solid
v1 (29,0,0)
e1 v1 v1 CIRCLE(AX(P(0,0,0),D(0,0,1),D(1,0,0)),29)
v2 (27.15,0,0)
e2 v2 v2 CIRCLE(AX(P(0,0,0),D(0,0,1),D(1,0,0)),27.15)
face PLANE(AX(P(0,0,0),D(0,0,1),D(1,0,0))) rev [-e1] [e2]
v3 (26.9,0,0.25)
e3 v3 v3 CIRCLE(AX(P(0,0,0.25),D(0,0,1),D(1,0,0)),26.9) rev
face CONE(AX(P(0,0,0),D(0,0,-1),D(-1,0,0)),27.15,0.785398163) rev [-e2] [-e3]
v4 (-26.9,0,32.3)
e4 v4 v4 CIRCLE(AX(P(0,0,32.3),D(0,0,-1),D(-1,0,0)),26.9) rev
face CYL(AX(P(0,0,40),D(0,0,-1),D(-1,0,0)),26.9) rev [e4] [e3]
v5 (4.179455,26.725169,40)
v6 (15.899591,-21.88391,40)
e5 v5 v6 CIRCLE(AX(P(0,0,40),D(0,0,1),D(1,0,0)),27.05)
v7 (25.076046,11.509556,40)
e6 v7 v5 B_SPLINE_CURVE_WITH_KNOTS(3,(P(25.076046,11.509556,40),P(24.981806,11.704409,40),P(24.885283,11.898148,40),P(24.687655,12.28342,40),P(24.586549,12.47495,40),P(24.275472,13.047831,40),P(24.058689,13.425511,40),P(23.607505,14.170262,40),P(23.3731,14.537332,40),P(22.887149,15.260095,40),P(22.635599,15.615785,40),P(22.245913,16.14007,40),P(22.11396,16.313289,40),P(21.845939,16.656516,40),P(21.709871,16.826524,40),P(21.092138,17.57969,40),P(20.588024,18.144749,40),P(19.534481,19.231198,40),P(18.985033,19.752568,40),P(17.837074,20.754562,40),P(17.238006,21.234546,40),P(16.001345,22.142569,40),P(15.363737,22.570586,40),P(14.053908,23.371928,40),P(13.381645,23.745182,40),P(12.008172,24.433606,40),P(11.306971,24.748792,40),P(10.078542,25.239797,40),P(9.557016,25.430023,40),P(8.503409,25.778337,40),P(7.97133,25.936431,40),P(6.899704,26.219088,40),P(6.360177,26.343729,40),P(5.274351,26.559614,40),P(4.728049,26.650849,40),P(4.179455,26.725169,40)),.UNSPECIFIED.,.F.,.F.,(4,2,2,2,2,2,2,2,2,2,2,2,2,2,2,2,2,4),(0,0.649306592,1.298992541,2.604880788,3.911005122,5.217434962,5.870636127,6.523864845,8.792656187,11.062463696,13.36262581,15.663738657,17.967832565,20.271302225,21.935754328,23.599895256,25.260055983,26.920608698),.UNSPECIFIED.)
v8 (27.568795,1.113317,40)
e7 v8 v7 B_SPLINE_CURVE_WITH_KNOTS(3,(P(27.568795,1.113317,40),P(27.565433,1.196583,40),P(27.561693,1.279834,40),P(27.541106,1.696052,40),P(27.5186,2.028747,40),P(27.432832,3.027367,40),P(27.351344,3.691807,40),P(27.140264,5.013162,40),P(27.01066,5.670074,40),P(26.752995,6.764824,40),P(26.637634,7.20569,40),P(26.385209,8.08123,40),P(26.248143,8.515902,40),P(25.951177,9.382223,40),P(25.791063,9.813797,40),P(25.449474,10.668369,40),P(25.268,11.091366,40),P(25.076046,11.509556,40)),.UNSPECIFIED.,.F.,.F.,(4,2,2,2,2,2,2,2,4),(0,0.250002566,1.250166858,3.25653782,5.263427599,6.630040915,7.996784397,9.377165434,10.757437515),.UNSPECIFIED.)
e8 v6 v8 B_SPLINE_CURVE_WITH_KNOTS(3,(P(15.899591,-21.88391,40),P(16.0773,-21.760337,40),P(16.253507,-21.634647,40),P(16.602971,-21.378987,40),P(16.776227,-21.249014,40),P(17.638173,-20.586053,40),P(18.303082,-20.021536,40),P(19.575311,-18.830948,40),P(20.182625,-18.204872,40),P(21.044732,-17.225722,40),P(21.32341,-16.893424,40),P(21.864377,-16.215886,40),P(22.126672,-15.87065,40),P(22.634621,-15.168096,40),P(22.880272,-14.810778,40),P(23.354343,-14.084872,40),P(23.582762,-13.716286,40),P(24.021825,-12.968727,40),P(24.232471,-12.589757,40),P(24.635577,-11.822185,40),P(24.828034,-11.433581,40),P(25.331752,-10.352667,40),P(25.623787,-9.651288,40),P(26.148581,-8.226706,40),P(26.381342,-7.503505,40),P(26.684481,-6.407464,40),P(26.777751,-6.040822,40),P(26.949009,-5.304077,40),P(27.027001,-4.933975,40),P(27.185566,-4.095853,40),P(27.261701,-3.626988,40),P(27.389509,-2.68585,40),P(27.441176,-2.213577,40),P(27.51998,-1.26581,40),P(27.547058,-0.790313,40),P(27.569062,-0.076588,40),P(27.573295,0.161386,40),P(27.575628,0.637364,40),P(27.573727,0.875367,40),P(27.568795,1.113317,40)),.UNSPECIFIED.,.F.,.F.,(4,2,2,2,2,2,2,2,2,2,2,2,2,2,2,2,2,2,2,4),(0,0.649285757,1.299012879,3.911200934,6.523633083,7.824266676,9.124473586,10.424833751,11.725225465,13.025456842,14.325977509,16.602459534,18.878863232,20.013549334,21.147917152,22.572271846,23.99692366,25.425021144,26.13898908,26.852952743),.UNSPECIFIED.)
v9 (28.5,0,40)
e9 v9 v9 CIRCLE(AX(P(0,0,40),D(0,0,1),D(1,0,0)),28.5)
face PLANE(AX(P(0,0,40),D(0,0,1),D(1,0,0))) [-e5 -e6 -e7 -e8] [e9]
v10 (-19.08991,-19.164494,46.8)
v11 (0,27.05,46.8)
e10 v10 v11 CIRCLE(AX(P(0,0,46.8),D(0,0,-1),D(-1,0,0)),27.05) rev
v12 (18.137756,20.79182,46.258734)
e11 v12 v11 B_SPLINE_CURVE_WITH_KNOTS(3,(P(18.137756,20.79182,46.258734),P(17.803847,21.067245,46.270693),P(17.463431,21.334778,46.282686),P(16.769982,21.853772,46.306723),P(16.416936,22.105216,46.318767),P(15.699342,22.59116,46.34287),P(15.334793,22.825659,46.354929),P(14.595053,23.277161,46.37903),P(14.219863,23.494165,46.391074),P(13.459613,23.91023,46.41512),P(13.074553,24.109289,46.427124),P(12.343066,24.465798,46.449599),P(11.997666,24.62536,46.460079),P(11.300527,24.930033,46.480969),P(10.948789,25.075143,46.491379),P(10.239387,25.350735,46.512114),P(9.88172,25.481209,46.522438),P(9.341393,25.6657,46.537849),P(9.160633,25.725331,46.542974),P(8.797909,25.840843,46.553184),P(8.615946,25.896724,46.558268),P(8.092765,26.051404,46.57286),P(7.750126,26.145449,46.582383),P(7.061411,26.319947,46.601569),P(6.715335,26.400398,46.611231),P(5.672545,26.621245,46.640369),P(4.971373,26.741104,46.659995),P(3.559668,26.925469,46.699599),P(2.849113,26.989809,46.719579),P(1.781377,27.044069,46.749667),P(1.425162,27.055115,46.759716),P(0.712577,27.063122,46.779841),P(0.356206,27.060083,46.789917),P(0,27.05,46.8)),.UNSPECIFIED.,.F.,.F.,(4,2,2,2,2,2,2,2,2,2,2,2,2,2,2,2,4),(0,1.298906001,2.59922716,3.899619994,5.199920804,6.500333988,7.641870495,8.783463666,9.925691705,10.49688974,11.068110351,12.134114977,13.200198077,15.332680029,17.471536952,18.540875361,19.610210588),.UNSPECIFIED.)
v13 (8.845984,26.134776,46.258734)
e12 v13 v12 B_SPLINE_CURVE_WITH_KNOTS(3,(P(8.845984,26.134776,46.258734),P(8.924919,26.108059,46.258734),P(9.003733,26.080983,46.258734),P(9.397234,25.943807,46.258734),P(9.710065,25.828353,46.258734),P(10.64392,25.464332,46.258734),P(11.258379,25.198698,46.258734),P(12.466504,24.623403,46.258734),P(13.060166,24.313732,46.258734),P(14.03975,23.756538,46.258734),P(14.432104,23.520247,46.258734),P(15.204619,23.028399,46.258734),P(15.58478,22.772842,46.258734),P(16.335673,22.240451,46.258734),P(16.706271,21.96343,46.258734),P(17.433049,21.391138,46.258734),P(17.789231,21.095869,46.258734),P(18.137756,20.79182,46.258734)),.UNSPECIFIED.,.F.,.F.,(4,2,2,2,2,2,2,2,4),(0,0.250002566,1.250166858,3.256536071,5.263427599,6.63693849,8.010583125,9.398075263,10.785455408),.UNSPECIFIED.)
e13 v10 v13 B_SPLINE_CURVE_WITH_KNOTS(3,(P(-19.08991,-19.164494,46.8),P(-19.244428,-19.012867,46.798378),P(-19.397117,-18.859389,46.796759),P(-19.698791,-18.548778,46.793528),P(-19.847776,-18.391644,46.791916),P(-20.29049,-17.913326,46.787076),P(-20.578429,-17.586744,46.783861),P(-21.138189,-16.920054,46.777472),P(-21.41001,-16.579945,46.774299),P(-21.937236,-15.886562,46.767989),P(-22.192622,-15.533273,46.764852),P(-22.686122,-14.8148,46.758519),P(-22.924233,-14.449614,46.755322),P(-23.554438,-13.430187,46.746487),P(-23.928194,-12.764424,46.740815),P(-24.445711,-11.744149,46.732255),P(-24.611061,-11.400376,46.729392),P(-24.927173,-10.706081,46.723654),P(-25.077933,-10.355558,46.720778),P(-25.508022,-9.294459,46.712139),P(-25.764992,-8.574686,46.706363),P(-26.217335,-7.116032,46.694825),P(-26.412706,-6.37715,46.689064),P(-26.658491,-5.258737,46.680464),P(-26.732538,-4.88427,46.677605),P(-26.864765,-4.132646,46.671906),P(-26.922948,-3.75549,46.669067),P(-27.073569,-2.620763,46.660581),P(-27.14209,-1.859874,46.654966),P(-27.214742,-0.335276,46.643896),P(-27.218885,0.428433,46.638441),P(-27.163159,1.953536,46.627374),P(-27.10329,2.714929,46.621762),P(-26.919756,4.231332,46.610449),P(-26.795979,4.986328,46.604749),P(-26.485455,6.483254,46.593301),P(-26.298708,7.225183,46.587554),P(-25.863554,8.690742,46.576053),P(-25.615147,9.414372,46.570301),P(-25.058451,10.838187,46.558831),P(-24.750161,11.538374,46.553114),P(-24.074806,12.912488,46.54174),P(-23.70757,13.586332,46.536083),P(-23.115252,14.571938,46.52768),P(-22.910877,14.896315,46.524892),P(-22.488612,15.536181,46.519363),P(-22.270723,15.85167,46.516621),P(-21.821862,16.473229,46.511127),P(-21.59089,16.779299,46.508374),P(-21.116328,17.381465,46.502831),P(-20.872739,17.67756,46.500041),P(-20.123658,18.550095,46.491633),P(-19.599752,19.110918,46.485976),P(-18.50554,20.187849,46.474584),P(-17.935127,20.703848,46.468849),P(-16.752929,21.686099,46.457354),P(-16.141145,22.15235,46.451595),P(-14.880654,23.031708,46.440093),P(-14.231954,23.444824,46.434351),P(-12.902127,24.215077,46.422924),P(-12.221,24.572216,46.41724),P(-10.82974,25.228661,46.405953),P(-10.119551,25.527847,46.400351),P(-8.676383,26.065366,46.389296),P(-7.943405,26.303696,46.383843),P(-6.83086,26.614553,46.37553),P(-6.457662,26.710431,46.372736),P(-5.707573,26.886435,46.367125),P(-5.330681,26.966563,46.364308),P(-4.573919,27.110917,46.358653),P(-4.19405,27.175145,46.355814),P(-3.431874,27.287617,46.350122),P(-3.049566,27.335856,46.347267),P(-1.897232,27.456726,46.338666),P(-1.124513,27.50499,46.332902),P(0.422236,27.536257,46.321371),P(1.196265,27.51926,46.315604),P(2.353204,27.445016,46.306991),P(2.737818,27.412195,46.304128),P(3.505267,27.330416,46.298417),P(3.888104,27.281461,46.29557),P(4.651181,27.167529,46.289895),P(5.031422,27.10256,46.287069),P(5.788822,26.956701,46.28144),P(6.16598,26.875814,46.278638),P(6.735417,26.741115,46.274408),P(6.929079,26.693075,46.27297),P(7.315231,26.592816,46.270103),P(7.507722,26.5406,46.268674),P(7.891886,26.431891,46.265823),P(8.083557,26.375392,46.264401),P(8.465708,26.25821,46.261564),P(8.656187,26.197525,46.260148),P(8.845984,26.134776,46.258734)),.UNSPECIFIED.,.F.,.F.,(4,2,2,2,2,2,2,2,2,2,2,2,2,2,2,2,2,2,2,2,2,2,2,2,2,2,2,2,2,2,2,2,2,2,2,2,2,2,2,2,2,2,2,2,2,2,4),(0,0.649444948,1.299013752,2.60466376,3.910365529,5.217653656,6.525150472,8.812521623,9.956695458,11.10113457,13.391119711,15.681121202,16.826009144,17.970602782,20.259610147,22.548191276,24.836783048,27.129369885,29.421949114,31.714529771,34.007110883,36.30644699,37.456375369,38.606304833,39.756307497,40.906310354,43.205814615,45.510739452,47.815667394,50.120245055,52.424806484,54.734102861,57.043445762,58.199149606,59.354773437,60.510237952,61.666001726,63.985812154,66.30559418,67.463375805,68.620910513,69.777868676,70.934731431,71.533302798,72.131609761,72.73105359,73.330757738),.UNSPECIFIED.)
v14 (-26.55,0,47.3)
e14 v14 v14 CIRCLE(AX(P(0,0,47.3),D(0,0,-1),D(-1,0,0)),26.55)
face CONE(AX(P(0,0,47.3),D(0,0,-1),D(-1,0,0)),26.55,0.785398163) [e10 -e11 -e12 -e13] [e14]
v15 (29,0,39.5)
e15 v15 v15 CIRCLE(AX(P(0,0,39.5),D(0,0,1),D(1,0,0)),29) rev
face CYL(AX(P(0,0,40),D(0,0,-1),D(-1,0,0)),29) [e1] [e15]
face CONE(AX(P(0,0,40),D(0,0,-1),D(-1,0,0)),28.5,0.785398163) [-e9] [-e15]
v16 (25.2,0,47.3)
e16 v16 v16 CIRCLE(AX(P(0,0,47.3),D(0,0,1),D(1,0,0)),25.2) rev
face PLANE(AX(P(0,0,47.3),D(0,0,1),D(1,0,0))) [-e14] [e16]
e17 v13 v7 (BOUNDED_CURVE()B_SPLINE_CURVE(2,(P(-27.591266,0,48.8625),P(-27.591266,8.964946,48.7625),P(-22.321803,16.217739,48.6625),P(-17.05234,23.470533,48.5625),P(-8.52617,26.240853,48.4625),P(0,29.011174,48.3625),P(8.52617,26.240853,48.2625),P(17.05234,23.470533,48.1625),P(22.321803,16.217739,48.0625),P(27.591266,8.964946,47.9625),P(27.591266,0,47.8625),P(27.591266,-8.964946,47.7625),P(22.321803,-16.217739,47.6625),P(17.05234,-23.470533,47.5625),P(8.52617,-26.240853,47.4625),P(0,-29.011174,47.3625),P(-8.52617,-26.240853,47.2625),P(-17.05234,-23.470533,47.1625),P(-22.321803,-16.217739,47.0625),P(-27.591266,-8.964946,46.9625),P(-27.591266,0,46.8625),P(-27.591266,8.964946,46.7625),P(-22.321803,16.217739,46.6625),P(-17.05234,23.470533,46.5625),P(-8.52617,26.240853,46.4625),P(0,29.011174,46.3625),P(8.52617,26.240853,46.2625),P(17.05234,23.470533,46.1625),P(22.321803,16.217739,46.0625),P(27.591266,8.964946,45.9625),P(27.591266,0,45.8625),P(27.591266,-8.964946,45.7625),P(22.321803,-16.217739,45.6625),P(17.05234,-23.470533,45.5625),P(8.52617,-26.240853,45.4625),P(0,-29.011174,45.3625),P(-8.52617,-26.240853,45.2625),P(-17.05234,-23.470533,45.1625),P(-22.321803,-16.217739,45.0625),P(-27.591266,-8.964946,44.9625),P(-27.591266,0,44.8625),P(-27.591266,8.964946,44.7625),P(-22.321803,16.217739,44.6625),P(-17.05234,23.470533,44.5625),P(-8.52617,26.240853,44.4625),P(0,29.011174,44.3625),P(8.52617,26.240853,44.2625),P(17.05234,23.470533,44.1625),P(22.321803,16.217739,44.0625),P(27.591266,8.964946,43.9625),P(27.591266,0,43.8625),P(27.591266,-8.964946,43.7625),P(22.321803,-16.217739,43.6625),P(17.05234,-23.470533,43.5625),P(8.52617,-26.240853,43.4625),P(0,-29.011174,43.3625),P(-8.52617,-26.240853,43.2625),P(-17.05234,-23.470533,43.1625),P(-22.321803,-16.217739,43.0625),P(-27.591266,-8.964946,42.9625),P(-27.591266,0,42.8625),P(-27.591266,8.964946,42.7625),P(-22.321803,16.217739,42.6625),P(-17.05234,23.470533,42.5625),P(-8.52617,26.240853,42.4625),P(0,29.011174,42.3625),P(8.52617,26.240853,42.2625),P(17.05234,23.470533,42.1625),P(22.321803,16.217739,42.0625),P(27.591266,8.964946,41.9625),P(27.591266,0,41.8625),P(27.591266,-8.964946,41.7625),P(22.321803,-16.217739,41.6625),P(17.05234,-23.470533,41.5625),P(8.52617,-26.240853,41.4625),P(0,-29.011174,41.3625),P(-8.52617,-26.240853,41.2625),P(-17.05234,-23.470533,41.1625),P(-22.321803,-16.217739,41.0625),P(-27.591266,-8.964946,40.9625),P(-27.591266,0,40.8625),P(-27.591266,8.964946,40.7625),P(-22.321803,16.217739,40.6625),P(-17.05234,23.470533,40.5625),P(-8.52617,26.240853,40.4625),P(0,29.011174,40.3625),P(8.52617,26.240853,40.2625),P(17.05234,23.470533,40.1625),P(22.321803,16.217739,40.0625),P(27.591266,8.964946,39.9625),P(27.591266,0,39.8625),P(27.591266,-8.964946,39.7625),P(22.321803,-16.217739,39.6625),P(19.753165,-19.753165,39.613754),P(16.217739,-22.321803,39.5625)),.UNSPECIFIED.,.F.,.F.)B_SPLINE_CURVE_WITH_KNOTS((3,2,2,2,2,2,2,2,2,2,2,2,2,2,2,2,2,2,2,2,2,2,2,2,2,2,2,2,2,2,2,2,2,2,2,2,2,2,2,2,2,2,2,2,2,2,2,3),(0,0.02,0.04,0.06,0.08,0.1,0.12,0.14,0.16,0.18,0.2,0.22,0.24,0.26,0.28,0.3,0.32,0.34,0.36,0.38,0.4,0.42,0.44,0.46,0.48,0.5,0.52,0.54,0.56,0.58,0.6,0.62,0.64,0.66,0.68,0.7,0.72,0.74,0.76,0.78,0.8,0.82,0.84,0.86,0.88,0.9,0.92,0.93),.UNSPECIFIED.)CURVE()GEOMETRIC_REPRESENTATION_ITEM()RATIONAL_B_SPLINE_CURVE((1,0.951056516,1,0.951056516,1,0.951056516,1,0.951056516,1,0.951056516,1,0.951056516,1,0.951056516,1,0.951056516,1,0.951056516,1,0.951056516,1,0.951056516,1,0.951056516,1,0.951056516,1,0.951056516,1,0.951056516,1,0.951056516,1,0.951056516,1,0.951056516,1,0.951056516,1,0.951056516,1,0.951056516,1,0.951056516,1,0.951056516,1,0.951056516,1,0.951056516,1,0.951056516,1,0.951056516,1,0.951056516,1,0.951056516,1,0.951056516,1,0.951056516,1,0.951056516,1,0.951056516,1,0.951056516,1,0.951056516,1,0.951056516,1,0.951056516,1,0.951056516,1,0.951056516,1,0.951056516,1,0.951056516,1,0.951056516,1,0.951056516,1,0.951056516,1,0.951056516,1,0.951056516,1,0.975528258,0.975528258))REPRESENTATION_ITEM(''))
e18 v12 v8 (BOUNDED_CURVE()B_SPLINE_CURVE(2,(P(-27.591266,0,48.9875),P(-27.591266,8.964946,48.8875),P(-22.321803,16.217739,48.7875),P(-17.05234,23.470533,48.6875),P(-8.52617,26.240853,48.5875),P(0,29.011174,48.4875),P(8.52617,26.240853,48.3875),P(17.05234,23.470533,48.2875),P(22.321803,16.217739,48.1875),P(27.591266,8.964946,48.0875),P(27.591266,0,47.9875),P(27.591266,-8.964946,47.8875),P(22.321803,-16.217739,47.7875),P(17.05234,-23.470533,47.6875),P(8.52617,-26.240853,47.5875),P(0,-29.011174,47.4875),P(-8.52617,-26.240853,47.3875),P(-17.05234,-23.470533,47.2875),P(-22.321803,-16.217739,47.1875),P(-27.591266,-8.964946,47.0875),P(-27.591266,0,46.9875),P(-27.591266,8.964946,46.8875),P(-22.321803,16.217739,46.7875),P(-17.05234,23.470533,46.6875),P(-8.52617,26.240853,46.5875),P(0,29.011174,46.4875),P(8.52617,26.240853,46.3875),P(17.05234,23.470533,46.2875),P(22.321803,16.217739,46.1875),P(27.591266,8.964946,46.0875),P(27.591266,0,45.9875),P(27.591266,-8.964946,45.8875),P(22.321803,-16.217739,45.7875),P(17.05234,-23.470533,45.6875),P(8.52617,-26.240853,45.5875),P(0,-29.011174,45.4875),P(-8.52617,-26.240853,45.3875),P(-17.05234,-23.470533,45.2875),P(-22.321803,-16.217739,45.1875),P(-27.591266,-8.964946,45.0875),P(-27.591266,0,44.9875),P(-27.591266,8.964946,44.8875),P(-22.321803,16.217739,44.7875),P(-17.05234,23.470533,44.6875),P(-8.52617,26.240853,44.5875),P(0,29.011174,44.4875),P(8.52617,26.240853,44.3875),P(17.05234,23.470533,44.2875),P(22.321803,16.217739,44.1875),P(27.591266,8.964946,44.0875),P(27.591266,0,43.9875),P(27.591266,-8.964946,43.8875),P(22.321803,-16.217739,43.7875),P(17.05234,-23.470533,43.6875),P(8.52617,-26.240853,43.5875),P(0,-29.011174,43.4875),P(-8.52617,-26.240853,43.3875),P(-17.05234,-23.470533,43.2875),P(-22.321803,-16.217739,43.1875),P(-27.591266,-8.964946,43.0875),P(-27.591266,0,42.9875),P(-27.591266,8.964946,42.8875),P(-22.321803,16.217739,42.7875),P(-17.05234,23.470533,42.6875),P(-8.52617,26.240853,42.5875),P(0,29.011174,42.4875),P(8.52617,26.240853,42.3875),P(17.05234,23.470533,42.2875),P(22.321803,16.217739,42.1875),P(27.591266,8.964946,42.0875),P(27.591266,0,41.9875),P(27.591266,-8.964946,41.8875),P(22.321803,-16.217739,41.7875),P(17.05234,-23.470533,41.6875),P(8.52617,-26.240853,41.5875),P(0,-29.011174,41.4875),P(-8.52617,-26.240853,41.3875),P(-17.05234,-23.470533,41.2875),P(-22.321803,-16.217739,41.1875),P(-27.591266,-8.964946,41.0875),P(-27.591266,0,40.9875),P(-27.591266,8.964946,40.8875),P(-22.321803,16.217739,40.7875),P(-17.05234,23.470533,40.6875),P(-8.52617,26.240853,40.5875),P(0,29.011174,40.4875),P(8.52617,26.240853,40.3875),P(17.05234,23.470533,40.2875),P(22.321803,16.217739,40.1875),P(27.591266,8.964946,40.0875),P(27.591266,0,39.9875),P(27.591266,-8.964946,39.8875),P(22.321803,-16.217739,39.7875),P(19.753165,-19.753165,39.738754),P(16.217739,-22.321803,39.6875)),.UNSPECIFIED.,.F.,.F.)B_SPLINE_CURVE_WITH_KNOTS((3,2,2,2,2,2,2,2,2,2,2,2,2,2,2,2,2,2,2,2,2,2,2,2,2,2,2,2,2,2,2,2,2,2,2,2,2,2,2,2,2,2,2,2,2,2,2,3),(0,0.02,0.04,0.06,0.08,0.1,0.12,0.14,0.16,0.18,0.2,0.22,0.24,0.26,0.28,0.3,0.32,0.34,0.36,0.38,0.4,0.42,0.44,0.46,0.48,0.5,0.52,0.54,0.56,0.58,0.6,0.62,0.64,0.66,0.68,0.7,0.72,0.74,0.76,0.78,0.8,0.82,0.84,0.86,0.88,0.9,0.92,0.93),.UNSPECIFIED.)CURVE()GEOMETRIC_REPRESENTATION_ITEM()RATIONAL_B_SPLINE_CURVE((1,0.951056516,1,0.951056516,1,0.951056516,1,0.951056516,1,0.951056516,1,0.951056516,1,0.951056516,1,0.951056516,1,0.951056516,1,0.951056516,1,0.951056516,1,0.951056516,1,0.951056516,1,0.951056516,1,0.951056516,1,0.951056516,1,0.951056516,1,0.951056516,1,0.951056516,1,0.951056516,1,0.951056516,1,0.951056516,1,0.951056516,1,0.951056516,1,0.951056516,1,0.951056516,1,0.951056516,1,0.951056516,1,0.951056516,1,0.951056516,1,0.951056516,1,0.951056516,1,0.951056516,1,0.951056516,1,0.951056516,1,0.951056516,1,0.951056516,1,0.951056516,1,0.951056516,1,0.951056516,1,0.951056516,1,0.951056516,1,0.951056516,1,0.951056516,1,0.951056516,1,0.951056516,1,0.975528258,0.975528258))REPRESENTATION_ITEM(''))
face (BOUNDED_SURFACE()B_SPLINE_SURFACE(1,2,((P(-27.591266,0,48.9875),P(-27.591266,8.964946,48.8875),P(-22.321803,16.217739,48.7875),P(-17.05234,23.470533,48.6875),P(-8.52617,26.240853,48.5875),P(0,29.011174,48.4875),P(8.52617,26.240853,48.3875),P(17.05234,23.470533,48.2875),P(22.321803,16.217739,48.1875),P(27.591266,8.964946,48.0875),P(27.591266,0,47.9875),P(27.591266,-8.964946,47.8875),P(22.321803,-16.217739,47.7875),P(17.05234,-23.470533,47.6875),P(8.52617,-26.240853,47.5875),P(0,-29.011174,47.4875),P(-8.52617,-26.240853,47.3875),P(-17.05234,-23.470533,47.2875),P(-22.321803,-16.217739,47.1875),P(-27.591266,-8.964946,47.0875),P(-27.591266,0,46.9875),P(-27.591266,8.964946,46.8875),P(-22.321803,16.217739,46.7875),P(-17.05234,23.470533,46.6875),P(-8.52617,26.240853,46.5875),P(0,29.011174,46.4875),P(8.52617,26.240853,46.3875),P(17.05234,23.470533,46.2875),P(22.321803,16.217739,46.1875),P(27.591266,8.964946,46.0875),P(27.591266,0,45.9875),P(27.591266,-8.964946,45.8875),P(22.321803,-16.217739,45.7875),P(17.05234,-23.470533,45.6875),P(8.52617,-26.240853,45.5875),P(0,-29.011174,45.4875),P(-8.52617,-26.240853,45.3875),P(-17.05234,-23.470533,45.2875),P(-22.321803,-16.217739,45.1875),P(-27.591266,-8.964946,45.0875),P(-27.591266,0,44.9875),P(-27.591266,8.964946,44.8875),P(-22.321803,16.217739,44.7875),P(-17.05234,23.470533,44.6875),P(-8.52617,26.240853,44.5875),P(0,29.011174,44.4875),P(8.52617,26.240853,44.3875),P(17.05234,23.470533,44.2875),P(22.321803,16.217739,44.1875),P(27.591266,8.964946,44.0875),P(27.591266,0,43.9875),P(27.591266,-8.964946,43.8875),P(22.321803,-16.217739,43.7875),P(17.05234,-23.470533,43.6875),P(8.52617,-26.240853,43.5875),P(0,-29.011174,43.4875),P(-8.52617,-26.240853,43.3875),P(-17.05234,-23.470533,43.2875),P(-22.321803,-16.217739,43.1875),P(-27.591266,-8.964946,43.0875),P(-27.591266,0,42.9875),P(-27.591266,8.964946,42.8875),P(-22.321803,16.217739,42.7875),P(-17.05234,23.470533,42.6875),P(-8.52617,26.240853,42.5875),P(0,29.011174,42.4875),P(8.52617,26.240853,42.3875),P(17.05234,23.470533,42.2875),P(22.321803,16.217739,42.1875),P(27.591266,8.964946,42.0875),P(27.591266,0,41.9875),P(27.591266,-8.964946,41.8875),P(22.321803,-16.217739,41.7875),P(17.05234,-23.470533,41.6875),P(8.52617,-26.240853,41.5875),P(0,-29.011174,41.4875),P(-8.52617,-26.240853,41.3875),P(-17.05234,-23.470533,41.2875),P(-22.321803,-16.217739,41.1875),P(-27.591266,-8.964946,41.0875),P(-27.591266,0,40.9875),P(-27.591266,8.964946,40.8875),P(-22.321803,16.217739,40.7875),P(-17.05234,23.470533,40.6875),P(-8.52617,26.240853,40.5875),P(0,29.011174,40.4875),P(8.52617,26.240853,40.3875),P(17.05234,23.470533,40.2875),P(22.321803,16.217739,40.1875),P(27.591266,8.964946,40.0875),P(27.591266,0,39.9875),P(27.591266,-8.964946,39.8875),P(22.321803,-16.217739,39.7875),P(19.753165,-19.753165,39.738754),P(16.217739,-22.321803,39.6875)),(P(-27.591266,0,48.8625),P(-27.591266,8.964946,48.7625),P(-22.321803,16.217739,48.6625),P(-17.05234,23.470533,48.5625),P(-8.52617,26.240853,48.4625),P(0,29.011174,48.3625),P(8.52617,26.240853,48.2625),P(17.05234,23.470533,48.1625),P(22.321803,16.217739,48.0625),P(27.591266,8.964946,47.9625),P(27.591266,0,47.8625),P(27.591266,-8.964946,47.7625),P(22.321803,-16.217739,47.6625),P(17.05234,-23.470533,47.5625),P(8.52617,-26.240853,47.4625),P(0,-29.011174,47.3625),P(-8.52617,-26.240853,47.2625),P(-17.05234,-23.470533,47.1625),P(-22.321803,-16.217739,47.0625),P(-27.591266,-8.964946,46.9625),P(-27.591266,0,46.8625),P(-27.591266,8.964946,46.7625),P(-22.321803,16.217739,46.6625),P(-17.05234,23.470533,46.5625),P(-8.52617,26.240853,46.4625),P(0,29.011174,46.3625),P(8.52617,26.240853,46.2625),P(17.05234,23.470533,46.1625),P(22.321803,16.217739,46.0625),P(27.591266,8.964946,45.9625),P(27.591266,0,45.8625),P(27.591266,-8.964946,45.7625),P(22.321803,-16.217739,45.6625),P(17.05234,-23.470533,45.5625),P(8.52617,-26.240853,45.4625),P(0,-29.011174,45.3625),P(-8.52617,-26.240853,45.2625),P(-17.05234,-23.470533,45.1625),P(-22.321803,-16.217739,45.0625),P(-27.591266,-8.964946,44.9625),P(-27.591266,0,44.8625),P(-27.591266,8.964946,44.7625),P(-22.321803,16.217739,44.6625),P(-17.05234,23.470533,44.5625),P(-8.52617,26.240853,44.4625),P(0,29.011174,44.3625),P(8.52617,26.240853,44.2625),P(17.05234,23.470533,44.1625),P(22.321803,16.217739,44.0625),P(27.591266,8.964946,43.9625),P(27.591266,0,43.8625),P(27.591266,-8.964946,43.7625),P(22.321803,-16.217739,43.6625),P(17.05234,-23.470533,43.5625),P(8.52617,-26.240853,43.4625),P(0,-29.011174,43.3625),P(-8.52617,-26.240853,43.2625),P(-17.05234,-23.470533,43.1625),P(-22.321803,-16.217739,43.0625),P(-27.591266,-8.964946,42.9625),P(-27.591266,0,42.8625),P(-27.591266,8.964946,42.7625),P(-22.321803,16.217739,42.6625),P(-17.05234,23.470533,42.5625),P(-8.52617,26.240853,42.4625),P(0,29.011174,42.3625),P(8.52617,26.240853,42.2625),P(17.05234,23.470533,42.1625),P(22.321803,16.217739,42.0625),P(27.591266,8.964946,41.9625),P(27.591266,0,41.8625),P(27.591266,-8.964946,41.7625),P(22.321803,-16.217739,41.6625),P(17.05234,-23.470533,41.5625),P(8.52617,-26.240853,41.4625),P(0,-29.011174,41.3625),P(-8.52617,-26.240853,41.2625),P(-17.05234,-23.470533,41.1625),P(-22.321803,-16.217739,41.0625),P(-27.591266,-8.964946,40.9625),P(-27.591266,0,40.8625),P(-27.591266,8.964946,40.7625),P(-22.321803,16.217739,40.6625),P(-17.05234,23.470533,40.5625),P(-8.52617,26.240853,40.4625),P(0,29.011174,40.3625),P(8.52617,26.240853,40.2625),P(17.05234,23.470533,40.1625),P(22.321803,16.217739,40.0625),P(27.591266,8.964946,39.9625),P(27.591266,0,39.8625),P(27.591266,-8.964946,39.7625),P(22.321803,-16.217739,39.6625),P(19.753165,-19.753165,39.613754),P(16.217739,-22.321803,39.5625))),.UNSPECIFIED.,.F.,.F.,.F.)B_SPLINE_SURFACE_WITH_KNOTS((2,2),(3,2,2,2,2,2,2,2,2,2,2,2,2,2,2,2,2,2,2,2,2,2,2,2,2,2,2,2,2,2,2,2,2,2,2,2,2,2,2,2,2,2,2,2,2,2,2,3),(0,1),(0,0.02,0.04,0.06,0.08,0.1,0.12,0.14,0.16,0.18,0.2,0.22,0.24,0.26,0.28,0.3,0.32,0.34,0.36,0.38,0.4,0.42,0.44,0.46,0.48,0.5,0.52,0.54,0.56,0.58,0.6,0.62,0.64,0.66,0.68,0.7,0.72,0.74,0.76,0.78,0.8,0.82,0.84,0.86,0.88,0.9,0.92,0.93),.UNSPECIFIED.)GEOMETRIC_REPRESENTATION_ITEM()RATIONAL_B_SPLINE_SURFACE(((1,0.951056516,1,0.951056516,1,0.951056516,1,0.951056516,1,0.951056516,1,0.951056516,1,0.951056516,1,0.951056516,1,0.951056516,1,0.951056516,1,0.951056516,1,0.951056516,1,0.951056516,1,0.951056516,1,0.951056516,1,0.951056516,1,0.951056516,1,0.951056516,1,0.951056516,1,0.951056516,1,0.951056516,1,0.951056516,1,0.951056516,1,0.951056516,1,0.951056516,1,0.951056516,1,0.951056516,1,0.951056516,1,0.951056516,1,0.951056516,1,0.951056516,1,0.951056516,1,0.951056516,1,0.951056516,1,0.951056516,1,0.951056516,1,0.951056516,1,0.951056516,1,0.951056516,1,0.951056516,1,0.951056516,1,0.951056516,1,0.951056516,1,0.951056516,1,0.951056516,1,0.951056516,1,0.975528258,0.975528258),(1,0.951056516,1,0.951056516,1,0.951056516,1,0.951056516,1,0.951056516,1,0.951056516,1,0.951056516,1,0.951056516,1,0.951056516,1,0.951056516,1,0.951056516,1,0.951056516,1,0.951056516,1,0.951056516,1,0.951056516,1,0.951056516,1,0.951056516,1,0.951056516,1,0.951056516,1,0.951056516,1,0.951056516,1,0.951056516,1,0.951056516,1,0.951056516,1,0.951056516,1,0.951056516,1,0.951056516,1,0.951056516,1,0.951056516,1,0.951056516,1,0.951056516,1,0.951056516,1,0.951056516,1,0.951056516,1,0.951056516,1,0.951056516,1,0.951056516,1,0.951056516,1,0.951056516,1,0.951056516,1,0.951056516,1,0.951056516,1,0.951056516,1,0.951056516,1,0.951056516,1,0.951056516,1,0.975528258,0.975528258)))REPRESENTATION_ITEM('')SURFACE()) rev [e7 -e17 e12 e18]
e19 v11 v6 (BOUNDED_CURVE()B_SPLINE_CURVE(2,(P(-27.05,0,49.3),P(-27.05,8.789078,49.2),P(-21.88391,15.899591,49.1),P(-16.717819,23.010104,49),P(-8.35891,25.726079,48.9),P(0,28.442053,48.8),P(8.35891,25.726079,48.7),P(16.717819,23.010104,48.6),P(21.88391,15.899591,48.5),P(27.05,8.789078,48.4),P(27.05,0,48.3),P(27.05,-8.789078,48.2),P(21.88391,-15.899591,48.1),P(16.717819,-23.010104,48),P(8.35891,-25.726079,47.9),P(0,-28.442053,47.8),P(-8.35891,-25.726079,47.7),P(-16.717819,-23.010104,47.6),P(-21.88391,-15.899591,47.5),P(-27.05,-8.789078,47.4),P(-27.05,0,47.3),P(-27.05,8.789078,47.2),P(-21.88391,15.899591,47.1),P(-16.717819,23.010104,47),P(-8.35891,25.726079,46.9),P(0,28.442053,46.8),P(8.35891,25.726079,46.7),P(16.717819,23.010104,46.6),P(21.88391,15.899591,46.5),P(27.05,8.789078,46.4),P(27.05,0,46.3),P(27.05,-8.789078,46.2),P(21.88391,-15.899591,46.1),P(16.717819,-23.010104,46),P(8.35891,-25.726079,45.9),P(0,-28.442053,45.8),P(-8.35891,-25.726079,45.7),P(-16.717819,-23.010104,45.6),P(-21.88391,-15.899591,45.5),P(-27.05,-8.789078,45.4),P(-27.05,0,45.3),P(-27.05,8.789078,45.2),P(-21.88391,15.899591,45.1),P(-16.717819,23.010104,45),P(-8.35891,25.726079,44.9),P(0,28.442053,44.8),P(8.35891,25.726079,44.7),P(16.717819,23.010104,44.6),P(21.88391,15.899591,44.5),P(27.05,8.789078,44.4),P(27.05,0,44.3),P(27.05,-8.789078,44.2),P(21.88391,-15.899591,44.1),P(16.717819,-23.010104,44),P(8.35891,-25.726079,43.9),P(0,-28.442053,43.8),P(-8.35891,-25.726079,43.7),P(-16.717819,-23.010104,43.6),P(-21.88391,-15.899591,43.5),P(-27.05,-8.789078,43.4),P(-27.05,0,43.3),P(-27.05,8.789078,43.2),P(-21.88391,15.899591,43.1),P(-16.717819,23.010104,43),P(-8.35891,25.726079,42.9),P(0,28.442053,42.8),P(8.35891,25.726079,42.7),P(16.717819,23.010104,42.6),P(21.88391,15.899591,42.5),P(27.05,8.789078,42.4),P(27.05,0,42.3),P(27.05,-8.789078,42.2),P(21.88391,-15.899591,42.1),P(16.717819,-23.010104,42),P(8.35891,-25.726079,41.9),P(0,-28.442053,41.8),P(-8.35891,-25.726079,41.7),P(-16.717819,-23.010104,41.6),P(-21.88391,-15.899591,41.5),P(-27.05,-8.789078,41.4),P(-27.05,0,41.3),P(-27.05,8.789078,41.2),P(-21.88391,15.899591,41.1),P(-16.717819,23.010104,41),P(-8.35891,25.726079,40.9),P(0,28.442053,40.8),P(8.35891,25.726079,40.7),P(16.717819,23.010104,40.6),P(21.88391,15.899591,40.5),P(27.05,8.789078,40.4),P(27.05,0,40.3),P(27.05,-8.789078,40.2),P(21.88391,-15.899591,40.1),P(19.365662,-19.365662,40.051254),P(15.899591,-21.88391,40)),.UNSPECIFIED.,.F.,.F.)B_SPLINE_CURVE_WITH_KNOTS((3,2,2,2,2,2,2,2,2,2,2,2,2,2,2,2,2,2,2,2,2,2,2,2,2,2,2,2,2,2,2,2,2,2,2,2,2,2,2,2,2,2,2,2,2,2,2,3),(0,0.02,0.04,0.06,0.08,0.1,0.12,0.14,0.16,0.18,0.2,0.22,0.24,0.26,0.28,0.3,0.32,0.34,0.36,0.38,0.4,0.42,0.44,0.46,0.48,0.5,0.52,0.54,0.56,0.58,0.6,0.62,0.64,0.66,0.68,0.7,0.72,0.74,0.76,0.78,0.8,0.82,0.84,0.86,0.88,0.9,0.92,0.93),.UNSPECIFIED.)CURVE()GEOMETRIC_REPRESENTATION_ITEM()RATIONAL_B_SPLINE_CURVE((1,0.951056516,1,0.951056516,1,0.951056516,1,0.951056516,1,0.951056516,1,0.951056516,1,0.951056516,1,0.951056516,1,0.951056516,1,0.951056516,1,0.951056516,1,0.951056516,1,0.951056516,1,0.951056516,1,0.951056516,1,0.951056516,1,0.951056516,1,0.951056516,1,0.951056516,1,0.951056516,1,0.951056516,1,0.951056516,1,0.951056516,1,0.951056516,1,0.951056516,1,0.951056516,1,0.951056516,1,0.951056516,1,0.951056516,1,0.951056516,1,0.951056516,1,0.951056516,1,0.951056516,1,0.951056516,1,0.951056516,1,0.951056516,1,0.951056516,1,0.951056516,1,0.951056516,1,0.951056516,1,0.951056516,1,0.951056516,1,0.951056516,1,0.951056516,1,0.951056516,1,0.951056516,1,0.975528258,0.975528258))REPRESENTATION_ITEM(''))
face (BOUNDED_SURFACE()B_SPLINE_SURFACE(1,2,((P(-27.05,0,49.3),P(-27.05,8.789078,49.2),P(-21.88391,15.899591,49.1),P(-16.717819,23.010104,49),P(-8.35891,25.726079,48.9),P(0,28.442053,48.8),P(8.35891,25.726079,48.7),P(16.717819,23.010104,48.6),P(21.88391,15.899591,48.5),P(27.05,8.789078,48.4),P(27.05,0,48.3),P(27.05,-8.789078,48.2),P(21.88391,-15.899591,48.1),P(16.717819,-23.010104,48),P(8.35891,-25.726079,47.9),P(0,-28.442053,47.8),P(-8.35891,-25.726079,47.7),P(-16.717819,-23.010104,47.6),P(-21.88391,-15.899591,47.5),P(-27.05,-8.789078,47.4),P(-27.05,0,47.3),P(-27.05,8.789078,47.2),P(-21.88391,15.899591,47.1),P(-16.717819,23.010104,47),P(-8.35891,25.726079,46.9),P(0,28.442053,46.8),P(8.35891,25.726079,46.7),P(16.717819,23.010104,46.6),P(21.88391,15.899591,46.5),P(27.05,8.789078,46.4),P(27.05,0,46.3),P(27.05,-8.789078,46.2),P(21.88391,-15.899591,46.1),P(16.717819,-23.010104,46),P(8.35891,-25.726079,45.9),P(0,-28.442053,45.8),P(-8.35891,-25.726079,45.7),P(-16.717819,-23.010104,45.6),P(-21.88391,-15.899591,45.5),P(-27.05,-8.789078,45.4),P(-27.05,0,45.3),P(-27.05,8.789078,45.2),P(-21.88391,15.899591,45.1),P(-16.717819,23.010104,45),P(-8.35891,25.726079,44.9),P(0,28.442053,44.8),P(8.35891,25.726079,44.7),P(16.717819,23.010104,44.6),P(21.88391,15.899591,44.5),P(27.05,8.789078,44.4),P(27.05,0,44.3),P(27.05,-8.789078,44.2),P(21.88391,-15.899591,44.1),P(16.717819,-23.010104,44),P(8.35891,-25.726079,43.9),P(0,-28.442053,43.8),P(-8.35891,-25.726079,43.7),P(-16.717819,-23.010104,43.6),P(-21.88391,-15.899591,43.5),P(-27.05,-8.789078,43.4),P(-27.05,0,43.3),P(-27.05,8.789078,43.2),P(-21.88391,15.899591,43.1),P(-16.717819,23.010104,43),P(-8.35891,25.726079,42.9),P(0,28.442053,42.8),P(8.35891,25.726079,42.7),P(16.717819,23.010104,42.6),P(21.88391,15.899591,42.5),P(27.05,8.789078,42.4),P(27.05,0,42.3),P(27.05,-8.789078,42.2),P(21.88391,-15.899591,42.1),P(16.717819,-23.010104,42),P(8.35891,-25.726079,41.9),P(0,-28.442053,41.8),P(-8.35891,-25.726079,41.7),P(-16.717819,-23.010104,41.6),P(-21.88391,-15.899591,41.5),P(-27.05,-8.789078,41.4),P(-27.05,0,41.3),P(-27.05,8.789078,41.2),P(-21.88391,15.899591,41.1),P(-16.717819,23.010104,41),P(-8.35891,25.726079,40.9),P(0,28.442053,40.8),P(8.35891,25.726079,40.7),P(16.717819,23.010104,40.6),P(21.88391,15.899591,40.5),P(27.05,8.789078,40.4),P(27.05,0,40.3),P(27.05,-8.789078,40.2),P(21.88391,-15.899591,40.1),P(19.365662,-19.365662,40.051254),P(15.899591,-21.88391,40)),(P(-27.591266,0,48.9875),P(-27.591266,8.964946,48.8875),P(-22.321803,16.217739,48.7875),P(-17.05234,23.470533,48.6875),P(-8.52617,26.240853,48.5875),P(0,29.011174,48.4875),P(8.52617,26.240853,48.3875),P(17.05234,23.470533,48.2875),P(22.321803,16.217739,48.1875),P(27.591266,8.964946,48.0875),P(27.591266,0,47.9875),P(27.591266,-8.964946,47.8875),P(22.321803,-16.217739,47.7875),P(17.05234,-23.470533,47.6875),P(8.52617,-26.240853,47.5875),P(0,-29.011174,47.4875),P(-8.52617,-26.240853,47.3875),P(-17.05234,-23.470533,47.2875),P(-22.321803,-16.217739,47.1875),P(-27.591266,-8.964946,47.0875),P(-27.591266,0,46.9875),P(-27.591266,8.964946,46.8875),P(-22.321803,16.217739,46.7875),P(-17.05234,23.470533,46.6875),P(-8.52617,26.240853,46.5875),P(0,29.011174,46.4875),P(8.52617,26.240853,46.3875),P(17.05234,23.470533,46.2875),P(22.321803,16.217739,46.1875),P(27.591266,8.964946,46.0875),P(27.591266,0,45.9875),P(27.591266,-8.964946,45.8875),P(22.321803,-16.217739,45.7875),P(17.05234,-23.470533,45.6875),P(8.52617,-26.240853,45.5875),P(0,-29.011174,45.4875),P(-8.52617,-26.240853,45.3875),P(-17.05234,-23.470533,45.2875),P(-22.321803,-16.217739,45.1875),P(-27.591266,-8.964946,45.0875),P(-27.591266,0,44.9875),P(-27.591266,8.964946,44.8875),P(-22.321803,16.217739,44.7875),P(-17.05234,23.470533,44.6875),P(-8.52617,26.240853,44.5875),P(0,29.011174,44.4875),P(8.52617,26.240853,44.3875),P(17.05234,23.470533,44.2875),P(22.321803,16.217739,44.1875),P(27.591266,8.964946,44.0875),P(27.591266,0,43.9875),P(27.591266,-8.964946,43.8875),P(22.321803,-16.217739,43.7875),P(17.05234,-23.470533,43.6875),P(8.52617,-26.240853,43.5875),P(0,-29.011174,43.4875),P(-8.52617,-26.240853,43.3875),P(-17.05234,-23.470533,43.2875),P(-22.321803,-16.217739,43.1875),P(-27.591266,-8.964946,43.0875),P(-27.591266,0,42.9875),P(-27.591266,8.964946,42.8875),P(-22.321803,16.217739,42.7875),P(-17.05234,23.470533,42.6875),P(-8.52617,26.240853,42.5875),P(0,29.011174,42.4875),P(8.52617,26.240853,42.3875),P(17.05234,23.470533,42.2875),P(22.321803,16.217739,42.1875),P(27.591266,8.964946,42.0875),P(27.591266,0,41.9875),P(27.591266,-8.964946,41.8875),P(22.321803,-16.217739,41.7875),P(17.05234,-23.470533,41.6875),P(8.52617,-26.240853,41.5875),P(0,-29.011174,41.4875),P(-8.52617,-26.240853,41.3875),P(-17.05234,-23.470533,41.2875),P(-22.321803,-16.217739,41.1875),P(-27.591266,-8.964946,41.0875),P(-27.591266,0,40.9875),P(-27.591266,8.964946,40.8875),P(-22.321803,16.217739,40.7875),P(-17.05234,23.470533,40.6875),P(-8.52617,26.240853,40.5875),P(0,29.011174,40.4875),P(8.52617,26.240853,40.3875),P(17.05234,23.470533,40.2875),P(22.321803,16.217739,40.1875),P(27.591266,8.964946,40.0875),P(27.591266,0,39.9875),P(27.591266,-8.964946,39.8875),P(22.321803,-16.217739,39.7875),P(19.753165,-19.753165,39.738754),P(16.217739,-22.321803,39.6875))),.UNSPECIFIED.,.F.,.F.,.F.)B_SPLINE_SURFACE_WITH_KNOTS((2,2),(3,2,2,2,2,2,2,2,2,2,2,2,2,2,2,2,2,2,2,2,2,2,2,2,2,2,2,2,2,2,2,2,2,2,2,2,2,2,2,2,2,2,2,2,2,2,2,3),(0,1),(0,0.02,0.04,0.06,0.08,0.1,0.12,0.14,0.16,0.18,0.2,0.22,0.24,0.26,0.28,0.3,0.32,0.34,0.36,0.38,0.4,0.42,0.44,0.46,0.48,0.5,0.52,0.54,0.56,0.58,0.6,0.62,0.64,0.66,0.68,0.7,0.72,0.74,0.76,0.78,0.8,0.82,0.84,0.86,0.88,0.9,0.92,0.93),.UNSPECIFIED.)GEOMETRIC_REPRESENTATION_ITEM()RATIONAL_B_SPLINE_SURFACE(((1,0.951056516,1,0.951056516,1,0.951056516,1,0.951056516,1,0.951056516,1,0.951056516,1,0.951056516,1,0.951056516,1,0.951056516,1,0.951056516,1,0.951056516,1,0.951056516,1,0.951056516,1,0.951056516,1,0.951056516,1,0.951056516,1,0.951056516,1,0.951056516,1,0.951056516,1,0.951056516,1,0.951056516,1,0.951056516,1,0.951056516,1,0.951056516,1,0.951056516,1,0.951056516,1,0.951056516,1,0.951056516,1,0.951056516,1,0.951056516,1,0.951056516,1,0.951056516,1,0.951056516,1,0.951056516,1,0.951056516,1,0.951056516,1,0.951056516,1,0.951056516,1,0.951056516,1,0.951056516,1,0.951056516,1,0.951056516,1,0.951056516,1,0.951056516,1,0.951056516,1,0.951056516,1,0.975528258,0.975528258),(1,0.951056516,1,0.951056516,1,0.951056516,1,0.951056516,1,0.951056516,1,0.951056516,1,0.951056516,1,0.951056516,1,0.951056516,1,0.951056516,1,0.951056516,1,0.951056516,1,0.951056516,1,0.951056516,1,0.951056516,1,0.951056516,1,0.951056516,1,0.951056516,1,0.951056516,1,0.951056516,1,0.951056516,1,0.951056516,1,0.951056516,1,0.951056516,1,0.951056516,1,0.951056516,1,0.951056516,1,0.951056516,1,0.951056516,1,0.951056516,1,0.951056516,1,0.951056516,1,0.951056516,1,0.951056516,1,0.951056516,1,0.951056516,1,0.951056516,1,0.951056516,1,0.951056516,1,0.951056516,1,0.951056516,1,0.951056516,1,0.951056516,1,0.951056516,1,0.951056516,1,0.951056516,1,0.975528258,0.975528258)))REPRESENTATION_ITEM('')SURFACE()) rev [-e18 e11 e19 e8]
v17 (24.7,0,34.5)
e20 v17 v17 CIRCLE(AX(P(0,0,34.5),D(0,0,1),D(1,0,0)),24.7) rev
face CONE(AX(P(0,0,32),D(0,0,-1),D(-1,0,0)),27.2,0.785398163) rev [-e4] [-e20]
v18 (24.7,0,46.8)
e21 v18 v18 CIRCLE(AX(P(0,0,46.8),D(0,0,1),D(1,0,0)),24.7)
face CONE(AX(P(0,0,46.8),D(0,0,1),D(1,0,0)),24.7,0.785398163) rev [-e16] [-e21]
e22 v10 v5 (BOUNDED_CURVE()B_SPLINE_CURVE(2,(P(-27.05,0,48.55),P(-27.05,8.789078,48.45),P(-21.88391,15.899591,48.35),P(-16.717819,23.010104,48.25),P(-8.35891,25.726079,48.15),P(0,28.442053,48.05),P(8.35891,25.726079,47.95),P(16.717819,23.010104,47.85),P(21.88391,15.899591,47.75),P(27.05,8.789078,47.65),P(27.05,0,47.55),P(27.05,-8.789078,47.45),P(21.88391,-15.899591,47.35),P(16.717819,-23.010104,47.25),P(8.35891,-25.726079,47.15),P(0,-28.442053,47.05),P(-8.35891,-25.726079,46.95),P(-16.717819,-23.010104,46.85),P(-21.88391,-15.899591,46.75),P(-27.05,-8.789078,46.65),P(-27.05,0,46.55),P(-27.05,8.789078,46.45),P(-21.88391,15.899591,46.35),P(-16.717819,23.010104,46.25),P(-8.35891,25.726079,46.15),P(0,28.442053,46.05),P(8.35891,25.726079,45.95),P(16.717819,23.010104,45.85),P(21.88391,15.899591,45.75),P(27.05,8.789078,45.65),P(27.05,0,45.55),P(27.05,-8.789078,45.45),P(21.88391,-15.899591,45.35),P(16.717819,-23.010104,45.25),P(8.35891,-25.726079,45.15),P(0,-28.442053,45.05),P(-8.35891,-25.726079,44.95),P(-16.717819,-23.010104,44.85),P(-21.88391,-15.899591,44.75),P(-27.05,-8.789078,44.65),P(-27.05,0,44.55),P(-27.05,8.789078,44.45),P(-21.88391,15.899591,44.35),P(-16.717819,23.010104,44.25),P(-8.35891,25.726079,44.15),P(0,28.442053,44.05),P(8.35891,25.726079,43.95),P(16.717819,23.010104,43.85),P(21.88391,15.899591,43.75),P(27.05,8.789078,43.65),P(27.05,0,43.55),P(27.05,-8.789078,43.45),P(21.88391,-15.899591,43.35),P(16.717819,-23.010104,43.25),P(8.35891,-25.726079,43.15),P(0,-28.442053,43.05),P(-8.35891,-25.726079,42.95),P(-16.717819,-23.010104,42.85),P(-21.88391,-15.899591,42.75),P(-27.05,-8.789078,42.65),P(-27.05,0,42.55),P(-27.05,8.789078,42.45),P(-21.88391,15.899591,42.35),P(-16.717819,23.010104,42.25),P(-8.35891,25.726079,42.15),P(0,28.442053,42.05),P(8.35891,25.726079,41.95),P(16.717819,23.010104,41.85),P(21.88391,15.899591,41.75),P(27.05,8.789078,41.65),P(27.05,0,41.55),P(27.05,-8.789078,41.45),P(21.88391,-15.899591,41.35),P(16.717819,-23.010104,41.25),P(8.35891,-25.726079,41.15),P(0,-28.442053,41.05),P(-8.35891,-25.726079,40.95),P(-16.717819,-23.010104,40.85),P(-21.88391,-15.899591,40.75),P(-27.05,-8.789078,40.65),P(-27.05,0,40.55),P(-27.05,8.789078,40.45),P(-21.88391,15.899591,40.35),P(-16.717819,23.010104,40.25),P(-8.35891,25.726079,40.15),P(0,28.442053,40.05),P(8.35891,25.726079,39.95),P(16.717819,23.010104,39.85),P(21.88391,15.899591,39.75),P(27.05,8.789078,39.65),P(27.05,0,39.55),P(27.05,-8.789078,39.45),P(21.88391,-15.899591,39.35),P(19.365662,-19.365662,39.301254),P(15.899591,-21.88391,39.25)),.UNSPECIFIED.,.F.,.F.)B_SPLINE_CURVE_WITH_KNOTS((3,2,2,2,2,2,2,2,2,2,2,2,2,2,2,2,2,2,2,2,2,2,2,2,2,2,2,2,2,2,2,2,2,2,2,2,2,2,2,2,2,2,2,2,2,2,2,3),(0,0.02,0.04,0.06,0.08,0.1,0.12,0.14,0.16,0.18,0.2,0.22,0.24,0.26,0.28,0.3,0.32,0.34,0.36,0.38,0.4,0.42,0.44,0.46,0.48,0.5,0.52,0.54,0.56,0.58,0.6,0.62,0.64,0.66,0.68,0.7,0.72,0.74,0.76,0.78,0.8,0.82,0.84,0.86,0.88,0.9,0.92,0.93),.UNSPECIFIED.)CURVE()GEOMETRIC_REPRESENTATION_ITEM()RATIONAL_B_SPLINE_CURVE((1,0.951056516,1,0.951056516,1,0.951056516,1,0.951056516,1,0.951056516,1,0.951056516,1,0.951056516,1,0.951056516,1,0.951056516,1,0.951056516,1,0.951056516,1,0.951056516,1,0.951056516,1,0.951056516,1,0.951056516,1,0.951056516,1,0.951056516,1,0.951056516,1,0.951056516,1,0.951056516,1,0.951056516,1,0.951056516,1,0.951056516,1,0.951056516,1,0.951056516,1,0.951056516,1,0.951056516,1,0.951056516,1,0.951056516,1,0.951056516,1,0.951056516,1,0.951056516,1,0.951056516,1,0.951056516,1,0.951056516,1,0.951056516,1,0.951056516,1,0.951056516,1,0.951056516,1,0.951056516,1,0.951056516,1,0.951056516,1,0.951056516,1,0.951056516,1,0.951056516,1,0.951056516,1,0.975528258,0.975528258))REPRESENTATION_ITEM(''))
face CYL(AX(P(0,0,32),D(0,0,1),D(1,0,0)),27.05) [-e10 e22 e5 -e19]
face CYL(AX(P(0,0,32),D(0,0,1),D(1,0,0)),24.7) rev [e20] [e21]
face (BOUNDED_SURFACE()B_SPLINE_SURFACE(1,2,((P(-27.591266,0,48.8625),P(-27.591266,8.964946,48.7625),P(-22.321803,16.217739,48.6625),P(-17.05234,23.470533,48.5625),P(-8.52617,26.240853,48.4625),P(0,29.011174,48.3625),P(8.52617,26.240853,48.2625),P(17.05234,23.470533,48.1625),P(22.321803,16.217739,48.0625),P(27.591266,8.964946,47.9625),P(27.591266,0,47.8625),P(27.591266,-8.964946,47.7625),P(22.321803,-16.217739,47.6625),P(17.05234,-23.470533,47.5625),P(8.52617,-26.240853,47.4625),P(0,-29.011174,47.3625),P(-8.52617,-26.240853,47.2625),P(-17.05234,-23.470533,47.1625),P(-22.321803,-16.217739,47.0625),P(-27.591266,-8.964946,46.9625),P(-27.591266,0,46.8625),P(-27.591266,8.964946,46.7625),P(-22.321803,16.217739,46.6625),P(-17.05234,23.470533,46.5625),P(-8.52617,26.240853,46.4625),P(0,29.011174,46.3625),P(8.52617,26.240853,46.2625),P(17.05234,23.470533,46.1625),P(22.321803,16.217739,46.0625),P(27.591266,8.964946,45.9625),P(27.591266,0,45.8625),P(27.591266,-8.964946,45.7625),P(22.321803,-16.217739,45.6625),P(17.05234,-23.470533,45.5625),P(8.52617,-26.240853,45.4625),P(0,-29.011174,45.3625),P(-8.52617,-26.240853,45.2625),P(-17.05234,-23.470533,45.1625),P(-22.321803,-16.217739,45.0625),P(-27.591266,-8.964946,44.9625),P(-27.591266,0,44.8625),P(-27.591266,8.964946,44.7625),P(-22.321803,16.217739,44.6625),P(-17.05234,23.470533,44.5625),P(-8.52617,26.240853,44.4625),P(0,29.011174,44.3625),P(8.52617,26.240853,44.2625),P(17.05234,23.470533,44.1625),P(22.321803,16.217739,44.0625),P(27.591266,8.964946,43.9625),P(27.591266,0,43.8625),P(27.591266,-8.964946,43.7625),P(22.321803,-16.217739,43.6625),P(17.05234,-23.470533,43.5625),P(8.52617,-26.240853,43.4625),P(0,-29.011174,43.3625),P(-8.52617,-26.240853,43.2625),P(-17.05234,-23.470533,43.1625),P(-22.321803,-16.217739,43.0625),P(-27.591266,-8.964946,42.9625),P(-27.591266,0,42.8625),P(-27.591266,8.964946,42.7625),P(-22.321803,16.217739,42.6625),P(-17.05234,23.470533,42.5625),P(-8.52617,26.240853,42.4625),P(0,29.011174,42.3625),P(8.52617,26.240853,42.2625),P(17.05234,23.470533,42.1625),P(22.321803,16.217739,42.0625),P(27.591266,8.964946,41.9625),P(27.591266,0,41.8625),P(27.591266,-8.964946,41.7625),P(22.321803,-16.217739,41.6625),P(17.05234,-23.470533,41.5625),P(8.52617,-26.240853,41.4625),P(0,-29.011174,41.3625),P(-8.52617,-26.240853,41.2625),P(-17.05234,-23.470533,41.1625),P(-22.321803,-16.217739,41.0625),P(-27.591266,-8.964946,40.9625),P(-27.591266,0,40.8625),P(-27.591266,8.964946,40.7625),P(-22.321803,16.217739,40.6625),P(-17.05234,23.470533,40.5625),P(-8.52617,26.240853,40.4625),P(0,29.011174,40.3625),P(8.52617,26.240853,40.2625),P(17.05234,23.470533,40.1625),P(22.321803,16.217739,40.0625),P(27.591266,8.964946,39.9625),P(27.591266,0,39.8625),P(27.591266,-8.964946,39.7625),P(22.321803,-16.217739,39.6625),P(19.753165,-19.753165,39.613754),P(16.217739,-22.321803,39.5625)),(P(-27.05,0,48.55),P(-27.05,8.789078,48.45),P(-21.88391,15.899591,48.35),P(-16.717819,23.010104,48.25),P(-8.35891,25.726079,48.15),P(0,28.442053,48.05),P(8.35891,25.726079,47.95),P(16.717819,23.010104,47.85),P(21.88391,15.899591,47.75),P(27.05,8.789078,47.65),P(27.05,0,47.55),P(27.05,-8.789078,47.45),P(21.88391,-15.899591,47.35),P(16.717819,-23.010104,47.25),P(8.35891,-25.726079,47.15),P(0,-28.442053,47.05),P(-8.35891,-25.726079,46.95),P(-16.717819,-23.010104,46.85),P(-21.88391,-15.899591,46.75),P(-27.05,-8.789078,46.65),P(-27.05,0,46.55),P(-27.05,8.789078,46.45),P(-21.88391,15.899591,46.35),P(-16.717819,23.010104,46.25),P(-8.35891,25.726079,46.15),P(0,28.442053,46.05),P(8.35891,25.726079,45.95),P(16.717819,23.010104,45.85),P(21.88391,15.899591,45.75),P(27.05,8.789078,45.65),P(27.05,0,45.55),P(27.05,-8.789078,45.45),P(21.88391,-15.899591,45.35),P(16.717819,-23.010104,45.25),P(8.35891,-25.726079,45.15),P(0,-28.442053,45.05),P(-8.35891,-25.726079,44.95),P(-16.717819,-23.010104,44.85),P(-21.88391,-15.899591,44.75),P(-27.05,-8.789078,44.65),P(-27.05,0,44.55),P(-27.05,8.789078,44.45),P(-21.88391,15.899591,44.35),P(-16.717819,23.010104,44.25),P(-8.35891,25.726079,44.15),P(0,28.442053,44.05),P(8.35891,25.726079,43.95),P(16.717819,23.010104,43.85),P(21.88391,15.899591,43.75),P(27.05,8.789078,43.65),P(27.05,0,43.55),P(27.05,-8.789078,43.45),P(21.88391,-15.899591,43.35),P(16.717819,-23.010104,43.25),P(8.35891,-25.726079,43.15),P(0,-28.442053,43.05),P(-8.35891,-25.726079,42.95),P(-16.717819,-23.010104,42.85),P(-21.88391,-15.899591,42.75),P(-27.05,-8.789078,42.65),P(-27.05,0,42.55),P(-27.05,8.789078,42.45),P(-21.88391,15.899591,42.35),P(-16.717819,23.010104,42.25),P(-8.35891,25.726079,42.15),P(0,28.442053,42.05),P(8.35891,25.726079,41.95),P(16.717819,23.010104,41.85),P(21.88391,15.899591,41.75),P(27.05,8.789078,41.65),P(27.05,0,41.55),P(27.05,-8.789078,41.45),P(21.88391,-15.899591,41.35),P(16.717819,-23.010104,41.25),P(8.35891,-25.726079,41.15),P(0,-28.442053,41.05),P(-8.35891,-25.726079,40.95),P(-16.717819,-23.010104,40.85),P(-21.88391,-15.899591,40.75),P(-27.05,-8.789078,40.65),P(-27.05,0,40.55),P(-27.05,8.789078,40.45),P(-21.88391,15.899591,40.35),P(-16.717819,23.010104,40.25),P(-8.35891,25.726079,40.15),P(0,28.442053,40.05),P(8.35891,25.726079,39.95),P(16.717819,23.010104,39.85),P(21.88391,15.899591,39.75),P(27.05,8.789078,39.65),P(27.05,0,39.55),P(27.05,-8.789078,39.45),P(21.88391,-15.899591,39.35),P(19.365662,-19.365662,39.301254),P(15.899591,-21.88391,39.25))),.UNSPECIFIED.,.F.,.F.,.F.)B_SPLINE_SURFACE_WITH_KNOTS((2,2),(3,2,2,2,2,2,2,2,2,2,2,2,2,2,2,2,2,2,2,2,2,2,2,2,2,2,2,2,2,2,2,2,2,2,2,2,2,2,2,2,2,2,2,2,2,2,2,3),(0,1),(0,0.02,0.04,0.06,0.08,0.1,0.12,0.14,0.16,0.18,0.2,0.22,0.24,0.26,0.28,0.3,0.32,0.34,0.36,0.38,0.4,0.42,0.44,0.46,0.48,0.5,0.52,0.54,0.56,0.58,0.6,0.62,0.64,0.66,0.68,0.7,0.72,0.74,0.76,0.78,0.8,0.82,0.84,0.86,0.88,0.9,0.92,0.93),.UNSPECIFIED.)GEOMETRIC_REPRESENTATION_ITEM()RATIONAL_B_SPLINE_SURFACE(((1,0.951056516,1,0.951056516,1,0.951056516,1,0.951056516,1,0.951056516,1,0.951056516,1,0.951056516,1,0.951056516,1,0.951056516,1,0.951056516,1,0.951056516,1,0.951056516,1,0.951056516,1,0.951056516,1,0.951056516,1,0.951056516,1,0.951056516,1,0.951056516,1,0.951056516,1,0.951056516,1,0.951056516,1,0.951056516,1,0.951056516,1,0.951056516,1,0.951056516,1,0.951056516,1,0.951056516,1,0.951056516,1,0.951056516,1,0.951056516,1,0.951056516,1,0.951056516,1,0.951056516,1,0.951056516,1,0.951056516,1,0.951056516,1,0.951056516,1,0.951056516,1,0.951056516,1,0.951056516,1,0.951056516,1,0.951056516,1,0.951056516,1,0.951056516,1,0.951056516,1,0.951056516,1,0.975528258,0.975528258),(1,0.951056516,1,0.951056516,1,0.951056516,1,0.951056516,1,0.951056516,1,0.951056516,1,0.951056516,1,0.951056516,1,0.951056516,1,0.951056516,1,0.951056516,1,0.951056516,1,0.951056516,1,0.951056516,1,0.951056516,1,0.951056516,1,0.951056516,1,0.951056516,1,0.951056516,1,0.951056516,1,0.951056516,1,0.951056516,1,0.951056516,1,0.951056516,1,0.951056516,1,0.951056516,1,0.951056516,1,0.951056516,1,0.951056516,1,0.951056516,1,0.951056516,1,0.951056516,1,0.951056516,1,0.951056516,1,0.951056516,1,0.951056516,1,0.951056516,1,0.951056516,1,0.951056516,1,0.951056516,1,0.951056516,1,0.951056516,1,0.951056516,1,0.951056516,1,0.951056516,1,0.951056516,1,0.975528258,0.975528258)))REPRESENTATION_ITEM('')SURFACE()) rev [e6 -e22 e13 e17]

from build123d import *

# Parameters (mm, degrees)
SKETCH1_R           = 29
SKETCH1_R_2         = 26.9
EXTRUDE1_DEPTH      = 40
EXTRUDE2_DEPTH      = 7.3
EXTRUDE2_DEPTH_BACK = 8
SKETCH2_R           = 27.05
SKETCH2_R_2         = 24.7
THREAD1_PITCH       = 2
THREAD1_FROM        = 2
CHAMFER1_SIZE       = 0.5
CHAMFER2_SIZE       = 2.5
CHAMFER4_SIZE       = 0.25


with BuildPart() as part:
    # Sketch1 → Extrude1 (new body)
    with BuildSketch(Plane.XY):
        Circle(SKETCH1_R)
        Circle(SKETCH1_R_2, mode=Mode.SUBTRACT)
    extrude(amount=EXTRUDE1_DEPTH)

    # Sketch2 → Extrude2 (add, two sides: drawn at the far end of the back side and taken through both)
    with BuildSketch(Plane.XY.offset(40).offset(-EXTRUDE2_DEPTH_BACK)):
        Circle(SKETCH2_R)
        Circle(SKETCH2_R_2, mode=Mode.SUBTRACT)
    extrude(amount=EXTRUDE2_DEPTH + EXTRUDE2_DEPTH_BACK)

    # Thread1: arcs per turn and ends read off the stored shape
    # Thread1: the profile of Sketch4 profile screwed along a right-hand helix through 4.65 turns, 10 arcs to a turn; built about Z, then put on its axis
    thread1_z = Axis((0, 0, 0), (0, 0, 1))
    thread1_corners = [(27.0497, 0, -0.000173205), (27.591265875, 0, 0.312499999), (27.591265875, 0, 0.437499999), (27.0497, 0, 0.750173202)]
    with BuildLine(mode=Mode.PRIVATE) as thread1_profile:
        Line(thread1_corners[0], thread1_corners[1])
        Line(thread1_corners[1], thread1_corners[2])
        Line(thread1_corners[2], thread1_corners[3])
        Line(thread1_corners[3], thread1_corners[0])
    thread1_cap = Face(thread1_profile.wire())
    thread1_turn_angles = [0, 18, 36, 54, 72, 90, 108, 126, 144, 162, 180, 198, 216, 234, 252, 270, 288, 306, 324, 342, 360]
    thread1_turn_weights = [1, 0.9510565162951535, 1, 0.9510565162951535, 1, 0.9510565162951535, 1, 0.9510565162951535, 1, 0.9510565162951535, 1, 0.9510565162951535, 1, 0.9510565162951535, 1, 0.9510565162951535, 1, 0.9510565162951535, 1, 0.9510565162951535, 1]
    thread1_turn_rails = [Edge.make_bspline([Vector(p[0], p[1], 0).rotate(thread1_z, thread1_turn_angles[k]) / thread1_turn_weights[k] + Vector(0, 0, p[2] + THREAD1_PITCH * thread1_turn_angles[k] / 360) for k in range(21)], [0, 0, 0, 1, 1, 2, 2, 3, 3, 4, 4, 5, 5, 6, 6, 7, 7, 8, 8, 9, 9, 10, 10, 10], 2, thread1_turn_weights) for p in thread1_corners]
    thread1_turn_sides = [Face.make_surface_from_curves(thread1_turn_rails[p[0]], thread1_turn_rails[p[1]]) for p in [(0, 1), (1, 2), (2, 3), (3, 0)]]
    thread1_last_angles = [1440, 1458, 1476, 1494, 1512, 1530, 1548, 1566, 1584, 1602, 1620, 1638, 1656, 1665, 1674]
    thread1_last_weights = [1, 0.9510565162951535, 1, 0.9510565162951535, 1, 0.9510565162951535, 1, 0.9510565162951535, 1, 0.9510565162951535, 1, 0.9510565162951535, 1, 0.9876883405951371, 1]
    thread1_last_rails = [Edge.make_bspline([Vector(p[0], p[1], 0).rotate(thread1_z, thread1_last_angles[k]) / thread1_last_weights[k] + Vector(0, 0, p[2] + THREAD1_PITCH * thread1_last_angles[k] / 360) for k in range(15)], [0, 0, 0, 1, 1, 2, 2, 3, 3, 4, 4, 5, 5, 6, 6, 7, 7, 7], 2, thread1_last_weights) for p in thread1_corners]
    thread1_last_sides = [Face.make_surface_from_curves(thread1_last_rails[p[0]], thread1_last_rails[p[1]]) for p in [(0, 1), (1, 2), (2, 3), (3, 0)]]
    thread1 = Plane(origin=(0, 0, 49.3), x_dir=(-1, 0, 0), z_dir=(0, 0, -1)) * split(Solid(Shell([*[p.moved(Location((0, 0, THREAD1_PITCH * i))) for i in range(4) for p in thread1_turn_sides], *thread1_last_sides, thread1_cap, thread1_cap.rotate(thread1_z, 1674).moved(Location((0, 0, THREAD1_PITCH * 1674 / 360)))])), bisect_by=Plane.XY.offset(THREAD1_FROM), keep=Keep.TOP, mode=Mode.PRIVATE)
    add(thread1)

    # Chamfer1
    chamfer1_edges = [part.edges().sort_by_distance(p)[0] for p in [
        (-24.7, 0, 47.3),
        (-29, 0, 40),
    ]]
    chamfer(chamfer1_edges, length=CHAMFER1_SIZE)

    # Chamfer2
    # the kernel refuses this chamfer: 2.5 mm, written as the material it takes off along each edge
    with BuildSketch(Plane(origin=(0, 0, 32), x_dir=(1, 0, 0), z_dir=(0, -1, 0))) as chamfer2_piece_1_section:
        Polygon((24.7 + CHAMFER2_SIZE, 0), (24.7, CHAMFER2_SIZE), (24.7, 0), align=None)
    chamfer2_piece_1 = revolve(axis=Axis((0, 0, 32), (0, 0, 1)), mode=Mode.PRIVATE)
    chamfer2_piece_1 = chamfer2_piece_1 & Plane(origin=(0, 0, 32), x_dir=(1, 0, 0), z_dir=(0, 0, -1)) * Cylinder(26.9, 109, mode=Mode.PRIVATE)
    add(chamfer2_piece_1, mode=Mode.SUBTRACT)

    # Sketch7 → Cut-Revolve1 (revolve, cut)
    with BuildSketch(Plane(origin=(0, 0, 0), x_dir=(1, 0, 0), z_dir=(0, 1, 0))):
        Polygon((-28.009015865, -45.840984135), (-26.55, -47.3), (-27.05, -47.3), (-28.680601357, -47.3), (-28.680601357, -45.840984135), align=None)
    revolve(axis=Axis((0, 0, 0), (0, 0, 1)), mode=Mode.SUBTRACT)

    # Chamfer4
    chamfer4_edges = [part.edges().sort_by_distance(p)[0] for p in [
        (-26.9, 0, 0),
    ]]
    chamfer(chamfer4_edges, length=CHAMFER4_SIZE)


solid = part.part
